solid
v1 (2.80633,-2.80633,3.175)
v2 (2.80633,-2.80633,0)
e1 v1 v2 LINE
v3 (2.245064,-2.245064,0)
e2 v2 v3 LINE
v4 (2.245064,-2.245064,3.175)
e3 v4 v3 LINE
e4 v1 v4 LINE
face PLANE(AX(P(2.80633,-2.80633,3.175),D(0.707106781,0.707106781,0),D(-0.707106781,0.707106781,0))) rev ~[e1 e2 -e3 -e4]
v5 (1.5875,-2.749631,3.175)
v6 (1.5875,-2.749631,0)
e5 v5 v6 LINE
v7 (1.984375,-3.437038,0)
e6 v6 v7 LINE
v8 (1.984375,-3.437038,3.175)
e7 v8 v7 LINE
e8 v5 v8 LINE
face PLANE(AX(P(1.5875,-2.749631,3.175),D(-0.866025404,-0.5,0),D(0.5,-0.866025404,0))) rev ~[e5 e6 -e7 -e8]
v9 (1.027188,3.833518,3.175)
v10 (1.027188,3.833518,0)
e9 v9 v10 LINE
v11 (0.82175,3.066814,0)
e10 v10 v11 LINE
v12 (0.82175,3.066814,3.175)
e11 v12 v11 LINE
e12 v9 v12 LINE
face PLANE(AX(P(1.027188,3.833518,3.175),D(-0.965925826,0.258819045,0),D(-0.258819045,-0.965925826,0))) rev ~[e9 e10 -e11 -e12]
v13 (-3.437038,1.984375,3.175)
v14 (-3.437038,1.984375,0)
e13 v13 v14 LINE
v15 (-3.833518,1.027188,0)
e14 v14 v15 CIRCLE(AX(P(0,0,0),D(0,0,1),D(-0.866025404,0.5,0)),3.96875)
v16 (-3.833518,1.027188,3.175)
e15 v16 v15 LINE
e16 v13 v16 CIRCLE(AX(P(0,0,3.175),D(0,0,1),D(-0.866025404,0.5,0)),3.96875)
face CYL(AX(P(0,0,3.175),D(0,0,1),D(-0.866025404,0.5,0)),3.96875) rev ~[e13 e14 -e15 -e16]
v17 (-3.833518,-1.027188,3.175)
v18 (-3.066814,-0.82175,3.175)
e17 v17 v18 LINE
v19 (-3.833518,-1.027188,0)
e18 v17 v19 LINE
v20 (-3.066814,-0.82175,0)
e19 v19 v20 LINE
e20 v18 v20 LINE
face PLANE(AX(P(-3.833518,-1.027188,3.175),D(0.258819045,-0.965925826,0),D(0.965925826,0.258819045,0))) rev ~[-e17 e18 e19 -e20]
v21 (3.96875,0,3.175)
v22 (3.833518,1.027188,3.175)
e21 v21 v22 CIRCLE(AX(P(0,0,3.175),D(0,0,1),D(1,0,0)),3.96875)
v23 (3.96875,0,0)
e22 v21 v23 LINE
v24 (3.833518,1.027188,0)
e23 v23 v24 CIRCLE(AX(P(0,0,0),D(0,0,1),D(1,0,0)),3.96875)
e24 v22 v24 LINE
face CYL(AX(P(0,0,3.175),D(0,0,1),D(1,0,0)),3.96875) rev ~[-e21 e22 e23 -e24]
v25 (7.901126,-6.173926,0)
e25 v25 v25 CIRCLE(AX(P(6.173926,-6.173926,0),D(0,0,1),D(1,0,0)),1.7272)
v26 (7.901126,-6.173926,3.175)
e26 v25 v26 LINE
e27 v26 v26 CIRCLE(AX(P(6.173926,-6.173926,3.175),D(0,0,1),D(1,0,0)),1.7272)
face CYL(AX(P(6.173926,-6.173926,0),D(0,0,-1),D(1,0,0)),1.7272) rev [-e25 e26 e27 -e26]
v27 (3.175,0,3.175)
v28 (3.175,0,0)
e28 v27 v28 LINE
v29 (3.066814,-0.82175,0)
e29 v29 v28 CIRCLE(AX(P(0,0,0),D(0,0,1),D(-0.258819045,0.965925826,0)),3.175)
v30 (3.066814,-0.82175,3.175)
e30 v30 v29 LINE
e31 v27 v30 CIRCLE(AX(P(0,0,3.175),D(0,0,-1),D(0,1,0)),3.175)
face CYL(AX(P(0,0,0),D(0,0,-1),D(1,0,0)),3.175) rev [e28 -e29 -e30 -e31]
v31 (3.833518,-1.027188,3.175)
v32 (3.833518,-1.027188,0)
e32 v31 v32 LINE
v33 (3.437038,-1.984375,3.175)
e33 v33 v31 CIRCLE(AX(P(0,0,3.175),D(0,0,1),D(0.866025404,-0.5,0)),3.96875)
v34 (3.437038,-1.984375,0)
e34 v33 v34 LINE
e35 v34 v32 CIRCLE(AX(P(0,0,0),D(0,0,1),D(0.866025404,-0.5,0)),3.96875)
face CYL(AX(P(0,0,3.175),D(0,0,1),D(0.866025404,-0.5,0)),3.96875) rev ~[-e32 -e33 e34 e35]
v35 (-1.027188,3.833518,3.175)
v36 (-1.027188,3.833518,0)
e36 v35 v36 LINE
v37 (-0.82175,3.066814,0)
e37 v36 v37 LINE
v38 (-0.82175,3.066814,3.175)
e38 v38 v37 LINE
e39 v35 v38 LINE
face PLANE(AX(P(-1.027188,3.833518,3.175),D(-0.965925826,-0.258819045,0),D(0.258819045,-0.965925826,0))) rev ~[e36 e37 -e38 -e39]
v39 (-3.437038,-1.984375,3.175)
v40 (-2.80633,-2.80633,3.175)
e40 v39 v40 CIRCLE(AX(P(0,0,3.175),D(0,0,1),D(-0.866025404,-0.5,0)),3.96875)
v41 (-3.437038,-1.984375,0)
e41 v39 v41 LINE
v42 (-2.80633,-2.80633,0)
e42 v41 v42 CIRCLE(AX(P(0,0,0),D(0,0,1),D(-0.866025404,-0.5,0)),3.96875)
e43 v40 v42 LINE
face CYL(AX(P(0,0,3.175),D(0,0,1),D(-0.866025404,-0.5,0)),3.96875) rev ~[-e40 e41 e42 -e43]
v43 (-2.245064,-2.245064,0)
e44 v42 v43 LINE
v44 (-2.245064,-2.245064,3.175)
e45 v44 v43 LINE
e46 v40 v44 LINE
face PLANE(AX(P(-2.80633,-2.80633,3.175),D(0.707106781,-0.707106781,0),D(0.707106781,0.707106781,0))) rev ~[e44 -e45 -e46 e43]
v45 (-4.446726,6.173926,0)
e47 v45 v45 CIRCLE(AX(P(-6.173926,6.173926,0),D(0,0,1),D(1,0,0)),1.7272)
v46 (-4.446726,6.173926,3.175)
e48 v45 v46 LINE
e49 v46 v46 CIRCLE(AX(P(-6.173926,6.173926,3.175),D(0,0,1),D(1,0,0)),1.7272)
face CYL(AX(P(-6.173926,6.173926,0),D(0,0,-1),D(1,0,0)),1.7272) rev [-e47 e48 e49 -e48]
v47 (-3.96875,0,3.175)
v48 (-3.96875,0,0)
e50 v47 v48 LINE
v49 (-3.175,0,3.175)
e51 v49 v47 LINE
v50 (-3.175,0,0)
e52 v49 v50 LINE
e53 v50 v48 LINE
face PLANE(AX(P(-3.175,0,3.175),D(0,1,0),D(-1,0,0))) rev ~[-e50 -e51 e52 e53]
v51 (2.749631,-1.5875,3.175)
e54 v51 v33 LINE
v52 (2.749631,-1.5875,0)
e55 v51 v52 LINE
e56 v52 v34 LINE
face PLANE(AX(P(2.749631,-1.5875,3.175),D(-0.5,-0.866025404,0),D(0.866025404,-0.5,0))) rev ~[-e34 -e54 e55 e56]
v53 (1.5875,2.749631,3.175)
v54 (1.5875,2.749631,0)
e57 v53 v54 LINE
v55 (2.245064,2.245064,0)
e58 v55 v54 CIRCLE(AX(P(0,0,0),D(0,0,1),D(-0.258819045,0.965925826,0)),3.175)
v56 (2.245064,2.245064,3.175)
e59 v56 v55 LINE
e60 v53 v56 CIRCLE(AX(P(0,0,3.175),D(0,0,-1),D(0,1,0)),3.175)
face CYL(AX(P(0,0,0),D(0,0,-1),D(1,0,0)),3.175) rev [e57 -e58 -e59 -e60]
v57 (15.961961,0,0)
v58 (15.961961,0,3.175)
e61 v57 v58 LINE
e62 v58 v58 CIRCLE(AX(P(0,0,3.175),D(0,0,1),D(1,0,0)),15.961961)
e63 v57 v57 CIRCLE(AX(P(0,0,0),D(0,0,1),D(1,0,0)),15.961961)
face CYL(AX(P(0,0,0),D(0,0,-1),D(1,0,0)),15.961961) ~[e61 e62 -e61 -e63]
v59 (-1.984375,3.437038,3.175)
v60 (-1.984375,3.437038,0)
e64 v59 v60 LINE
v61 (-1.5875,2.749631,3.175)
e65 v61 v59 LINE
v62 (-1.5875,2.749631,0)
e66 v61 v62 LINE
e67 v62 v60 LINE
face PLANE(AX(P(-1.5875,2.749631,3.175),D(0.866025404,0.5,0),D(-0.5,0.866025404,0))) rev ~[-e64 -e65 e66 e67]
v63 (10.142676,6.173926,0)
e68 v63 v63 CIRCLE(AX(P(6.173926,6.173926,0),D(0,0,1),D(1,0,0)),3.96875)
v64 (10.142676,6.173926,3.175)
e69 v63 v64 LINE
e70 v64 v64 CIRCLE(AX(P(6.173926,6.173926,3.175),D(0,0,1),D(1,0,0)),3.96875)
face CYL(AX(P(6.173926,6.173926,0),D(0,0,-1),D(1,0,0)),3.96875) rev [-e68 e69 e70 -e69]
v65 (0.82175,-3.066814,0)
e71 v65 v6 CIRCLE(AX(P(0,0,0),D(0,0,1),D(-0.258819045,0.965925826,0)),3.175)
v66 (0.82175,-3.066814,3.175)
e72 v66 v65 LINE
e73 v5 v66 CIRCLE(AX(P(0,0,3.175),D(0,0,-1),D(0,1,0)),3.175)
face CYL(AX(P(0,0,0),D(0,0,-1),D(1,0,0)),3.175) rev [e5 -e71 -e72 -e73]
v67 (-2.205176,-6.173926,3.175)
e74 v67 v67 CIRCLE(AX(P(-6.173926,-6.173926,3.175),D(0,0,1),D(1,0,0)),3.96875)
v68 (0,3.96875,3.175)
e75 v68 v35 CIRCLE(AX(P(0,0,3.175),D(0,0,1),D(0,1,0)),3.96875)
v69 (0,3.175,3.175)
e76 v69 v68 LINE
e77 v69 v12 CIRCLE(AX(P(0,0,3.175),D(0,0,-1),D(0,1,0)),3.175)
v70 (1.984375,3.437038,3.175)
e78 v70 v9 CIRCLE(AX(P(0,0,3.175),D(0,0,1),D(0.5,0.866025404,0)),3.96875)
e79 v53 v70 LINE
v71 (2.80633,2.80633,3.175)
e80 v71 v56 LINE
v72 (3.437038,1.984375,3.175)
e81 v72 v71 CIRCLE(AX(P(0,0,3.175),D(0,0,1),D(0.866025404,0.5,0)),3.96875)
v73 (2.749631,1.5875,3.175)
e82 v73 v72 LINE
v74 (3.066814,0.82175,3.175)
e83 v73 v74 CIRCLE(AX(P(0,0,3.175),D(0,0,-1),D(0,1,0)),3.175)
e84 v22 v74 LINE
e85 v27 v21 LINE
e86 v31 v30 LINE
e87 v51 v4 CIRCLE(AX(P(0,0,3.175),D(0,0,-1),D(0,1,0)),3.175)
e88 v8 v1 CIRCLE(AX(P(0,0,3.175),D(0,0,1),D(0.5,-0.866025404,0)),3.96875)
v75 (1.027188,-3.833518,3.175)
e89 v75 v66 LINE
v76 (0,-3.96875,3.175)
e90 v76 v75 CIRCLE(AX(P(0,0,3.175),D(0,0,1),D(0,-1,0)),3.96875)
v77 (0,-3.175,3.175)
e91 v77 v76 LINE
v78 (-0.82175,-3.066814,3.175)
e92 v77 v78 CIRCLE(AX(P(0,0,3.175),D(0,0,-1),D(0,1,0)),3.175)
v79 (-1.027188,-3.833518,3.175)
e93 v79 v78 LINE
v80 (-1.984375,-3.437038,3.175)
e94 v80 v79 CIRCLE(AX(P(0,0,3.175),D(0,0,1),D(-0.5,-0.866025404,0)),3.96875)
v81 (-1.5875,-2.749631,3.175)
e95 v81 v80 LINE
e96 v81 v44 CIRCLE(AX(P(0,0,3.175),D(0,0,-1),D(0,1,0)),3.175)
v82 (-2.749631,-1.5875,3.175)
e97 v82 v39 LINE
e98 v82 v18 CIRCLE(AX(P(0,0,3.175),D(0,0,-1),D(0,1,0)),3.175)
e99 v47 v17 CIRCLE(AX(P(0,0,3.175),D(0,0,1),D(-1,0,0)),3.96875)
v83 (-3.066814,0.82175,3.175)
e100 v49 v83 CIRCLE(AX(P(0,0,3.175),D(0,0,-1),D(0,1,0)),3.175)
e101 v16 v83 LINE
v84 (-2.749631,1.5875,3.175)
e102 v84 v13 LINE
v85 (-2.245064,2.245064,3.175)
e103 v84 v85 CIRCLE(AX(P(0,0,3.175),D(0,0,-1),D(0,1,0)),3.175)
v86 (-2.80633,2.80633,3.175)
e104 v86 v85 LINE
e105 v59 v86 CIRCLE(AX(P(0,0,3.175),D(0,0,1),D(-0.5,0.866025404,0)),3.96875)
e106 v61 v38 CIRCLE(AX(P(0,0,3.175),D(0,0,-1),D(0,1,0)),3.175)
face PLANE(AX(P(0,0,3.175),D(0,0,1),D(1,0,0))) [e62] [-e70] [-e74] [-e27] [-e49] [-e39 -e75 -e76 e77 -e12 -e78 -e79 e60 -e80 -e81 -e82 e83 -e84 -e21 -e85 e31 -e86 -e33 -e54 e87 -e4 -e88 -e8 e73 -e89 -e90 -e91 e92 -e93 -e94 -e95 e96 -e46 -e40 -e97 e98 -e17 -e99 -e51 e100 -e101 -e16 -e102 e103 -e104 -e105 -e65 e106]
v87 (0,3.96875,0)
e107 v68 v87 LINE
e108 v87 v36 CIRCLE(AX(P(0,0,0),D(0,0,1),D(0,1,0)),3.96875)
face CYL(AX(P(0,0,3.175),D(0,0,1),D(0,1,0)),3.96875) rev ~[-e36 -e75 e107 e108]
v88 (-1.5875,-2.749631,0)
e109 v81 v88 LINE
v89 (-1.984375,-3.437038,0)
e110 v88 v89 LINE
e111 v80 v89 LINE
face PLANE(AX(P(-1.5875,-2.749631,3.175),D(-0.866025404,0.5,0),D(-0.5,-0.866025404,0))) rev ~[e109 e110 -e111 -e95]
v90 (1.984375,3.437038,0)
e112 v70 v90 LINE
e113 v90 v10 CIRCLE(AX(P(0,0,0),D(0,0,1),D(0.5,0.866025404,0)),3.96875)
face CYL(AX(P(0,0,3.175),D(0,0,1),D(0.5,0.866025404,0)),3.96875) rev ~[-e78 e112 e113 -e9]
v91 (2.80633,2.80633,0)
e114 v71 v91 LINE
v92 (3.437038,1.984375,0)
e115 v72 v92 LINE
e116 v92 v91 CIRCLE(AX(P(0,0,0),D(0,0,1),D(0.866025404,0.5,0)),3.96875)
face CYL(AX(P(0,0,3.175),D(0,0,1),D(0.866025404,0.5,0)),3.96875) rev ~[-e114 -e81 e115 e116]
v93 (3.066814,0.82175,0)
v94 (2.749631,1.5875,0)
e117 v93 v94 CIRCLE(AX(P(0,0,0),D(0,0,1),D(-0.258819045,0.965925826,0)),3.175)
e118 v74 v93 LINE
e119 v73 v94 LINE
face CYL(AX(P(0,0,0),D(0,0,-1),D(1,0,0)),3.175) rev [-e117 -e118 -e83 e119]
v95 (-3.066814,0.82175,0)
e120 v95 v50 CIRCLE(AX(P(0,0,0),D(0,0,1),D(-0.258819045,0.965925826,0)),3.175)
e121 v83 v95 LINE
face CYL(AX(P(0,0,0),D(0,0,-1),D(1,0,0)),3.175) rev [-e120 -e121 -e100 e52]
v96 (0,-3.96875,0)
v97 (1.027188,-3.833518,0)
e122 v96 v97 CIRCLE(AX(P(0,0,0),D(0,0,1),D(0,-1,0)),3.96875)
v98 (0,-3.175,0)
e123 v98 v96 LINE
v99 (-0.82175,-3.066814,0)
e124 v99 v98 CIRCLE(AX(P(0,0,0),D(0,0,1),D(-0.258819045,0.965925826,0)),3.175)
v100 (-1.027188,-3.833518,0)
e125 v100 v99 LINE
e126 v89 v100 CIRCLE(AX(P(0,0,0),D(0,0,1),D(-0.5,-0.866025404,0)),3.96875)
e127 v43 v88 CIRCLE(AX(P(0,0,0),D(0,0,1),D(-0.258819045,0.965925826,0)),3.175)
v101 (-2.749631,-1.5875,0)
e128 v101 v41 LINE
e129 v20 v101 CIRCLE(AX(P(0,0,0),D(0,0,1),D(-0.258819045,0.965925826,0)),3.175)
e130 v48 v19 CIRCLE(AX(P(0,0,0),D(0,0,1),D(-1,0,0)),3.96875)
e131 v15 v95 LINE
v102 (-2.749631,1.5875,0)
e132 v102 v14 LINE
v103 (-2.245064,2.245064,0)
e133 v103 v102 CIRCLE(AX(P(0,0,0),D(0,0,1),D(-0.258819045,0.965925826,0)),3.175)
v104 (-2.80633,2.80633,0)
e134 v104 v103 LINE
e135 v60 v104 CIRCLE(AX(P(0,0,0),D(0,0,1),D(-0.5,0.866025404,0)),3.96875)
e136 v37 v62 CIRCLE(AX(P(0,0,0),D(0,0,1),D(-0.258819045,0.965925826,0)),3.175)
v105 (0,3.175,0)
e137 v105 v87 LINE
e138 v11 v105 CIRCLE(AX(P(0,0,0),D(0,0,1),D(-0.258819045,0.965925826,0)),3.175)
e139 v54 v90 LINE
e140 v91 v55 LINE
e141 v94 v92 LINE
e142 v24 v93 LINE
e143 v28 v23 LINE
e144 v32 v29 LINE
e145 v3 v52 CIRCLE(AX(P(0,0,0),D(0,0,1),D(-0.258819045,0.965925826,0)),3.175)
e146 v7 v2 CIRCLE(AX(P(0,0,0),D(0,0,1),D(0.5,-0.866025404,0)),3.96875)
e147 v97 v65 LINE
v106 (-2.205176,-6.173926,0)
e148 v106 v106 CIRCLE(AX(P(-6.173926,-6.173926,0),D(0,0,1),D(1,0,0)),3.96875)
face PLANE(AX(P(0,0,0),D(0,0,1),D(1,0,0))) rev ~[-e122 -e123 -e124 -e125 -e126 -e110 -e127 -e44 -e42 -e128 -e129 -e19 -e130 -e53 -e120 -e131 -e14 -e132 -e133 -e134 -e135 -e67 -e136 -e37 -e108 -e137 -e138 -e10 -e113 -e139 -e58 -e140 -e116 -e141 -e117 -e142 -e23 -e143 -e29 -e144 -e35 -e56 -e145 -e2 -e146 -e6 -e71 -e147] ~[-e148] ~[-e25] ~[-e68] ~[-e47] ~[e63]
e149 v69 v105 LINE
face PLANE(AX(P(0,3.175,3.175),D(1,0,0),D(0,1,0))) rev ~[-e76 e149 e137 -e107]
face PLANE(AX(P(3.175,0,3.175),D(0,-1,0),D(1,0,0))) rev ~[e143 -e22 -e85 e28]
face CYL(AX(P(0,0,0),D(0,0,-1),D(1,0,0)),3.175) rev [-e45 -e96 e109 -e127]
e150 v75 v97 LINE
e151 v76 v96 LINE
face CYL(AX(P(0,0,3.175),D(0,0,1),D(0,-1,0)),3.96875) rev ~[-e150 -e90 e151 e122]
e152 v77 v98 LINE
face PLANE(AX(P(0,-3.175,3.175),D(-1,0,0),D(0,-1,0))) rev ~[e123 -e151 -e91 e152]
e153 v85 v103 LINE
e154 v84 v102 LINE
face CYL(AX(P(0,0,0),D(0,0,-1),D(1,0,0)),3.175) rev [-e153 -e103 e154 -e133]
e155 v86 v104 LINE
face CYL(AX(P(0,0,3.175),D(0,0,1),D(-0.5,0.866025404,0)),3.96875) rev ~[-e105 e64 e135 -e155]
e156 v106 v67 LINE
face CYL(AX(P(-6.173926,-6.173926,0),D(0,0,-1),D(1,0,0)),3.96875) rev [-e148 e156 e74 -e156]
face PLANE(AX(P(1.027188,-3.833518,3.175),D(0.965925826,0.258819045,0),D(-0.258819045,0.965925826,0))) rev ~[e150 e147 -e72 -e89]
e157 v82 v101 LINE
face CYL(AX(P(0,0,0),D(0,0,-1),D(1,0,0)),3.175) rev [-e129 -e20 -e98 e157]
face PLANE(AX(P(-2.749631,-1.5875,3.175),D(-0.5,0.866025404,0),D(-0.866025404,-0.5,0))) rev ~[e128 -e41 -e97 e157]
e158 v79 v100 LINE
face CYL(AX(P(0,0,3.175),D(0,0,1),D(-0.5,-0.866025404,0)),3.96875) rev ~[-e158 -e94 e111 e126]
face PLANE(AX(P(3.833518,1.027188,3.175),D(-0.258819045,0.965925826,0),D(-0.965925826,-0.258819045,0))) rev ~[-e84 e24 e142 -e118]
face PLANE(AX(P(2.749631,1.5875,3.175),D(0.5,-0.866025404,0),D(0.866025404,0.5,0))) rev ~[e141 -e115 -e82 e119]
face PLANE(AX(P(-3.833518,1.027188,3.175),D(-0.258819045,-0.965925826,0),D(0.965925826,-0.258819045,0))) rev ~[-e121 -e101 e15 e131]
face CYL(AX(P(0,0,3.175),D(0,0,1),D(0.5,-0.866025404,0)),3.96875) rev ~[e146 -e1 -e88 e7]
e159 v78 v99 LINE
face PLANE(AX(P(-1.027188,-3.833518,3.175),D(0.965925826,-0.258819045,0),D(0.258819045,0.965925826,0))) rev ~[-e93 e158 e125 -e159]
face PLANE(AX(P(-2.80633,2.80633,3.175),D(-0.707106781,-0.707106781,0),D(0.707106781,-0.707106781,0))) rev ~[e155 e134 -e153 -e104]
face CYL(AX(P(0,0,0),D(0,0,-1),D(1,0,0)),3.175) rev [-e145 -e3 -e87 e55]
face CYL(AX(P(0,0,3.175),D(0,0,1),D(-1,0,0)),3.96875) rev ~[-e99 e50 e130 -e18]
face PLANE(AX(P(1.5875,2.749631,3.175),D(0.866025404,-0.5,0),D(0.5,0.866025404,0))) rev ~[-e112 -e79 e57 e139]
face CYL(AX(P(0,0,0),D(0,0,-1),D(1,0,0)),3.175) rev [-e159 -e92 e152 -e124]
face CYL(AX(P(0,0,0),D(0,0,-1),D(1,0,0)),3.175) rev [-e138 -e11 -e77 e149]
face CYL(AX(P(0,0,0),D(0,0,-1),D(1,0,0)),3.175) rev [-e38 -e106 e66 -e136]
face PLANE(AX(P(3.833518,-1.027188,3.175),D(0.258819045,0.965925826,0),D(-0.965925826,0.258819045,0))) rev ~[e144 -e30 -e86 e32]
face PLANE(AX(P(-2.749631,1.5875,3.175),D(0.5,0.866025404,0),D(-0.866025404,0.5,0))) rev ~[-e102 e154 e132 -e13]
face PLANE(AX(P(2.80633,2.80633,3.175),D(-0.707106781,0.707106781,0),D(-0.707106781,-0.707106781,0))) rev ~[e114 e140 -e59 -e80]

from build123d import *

# Parameters (mm, degrees)
F0_R            = 15.961960717
F0_R_2          = 3.96875
F0_R_3          = 3.175
F0_R_4          = 1.7272
F1_DEPTH        = 3.175
F3_DEPTH        = 3.175
F3_COPIES_COUNT = 12


# Not quite as in the source:
# - a pattern or mirror of a feature is missing from the dataset's text; its kind, count and spacing are read off the source's solid


with BuildPart() as f1:
    # F0 (on Top) → F1 (new body)
    with BuildSketch(Plane.XY):
        Circle(F0_R)
        with Locations((-6.1739260832, -6.1739260832)):
            Circle(F0_R_2, mode=Mode.SUBTRACT)
        Circle(F0_R_3, mode=Mode.SUBTRACT)
        with Locations((6.1739260832, -6.1739260832)):
            Circle(F0_R_4, mode=Mode.SUBTRACT)
        with Locations((-6.1739260832, 6.1739260832)):
            Circle(F0_R_4, mode=Mode.SUBTRACT)
        with Locations((6.1739260832, 6.1739260832)):
            Circle(F0_R_2, mode=Mode.SUBTRACT)
    extrude(amount=F1_DEPTH)

    # F2 (on face) → F3 (cut, through all)
    with BuildSketch(Plane.XY.offset(3.175)):
        with BuildLine():
            Line((-1.0271880853, 3.8335181231), (-0.8217504682, 3.0668144985))
            ThreePointArc((-0.8217504682, 3.0668144985), (-0.4144206603, 3.1478374349), (0, 3.175))
            Line((0, 3.175), (0, 3.96875))
            ThreePointArc((0, 3.96875), (-0.5180258254, 3.9347967936), (-1.0271880853, 3.8335181231))
        make_face()
    f3 = extrude(amount=-F3_DEPTH, mode=Mode.SUBTRACT)

    # F3_copies: F3 ×12 about axis
    f3_copies_axis = Axis((0, 0, 0), (0, 0, 1))
    for i in range(1, F3_COPIES_COUNT):
        add(f3.rotate(f3_copies_axis, i * 360 / F3_COPIES_COUNT), mode=Mode.SUBTRACT)


solid = f1.part
